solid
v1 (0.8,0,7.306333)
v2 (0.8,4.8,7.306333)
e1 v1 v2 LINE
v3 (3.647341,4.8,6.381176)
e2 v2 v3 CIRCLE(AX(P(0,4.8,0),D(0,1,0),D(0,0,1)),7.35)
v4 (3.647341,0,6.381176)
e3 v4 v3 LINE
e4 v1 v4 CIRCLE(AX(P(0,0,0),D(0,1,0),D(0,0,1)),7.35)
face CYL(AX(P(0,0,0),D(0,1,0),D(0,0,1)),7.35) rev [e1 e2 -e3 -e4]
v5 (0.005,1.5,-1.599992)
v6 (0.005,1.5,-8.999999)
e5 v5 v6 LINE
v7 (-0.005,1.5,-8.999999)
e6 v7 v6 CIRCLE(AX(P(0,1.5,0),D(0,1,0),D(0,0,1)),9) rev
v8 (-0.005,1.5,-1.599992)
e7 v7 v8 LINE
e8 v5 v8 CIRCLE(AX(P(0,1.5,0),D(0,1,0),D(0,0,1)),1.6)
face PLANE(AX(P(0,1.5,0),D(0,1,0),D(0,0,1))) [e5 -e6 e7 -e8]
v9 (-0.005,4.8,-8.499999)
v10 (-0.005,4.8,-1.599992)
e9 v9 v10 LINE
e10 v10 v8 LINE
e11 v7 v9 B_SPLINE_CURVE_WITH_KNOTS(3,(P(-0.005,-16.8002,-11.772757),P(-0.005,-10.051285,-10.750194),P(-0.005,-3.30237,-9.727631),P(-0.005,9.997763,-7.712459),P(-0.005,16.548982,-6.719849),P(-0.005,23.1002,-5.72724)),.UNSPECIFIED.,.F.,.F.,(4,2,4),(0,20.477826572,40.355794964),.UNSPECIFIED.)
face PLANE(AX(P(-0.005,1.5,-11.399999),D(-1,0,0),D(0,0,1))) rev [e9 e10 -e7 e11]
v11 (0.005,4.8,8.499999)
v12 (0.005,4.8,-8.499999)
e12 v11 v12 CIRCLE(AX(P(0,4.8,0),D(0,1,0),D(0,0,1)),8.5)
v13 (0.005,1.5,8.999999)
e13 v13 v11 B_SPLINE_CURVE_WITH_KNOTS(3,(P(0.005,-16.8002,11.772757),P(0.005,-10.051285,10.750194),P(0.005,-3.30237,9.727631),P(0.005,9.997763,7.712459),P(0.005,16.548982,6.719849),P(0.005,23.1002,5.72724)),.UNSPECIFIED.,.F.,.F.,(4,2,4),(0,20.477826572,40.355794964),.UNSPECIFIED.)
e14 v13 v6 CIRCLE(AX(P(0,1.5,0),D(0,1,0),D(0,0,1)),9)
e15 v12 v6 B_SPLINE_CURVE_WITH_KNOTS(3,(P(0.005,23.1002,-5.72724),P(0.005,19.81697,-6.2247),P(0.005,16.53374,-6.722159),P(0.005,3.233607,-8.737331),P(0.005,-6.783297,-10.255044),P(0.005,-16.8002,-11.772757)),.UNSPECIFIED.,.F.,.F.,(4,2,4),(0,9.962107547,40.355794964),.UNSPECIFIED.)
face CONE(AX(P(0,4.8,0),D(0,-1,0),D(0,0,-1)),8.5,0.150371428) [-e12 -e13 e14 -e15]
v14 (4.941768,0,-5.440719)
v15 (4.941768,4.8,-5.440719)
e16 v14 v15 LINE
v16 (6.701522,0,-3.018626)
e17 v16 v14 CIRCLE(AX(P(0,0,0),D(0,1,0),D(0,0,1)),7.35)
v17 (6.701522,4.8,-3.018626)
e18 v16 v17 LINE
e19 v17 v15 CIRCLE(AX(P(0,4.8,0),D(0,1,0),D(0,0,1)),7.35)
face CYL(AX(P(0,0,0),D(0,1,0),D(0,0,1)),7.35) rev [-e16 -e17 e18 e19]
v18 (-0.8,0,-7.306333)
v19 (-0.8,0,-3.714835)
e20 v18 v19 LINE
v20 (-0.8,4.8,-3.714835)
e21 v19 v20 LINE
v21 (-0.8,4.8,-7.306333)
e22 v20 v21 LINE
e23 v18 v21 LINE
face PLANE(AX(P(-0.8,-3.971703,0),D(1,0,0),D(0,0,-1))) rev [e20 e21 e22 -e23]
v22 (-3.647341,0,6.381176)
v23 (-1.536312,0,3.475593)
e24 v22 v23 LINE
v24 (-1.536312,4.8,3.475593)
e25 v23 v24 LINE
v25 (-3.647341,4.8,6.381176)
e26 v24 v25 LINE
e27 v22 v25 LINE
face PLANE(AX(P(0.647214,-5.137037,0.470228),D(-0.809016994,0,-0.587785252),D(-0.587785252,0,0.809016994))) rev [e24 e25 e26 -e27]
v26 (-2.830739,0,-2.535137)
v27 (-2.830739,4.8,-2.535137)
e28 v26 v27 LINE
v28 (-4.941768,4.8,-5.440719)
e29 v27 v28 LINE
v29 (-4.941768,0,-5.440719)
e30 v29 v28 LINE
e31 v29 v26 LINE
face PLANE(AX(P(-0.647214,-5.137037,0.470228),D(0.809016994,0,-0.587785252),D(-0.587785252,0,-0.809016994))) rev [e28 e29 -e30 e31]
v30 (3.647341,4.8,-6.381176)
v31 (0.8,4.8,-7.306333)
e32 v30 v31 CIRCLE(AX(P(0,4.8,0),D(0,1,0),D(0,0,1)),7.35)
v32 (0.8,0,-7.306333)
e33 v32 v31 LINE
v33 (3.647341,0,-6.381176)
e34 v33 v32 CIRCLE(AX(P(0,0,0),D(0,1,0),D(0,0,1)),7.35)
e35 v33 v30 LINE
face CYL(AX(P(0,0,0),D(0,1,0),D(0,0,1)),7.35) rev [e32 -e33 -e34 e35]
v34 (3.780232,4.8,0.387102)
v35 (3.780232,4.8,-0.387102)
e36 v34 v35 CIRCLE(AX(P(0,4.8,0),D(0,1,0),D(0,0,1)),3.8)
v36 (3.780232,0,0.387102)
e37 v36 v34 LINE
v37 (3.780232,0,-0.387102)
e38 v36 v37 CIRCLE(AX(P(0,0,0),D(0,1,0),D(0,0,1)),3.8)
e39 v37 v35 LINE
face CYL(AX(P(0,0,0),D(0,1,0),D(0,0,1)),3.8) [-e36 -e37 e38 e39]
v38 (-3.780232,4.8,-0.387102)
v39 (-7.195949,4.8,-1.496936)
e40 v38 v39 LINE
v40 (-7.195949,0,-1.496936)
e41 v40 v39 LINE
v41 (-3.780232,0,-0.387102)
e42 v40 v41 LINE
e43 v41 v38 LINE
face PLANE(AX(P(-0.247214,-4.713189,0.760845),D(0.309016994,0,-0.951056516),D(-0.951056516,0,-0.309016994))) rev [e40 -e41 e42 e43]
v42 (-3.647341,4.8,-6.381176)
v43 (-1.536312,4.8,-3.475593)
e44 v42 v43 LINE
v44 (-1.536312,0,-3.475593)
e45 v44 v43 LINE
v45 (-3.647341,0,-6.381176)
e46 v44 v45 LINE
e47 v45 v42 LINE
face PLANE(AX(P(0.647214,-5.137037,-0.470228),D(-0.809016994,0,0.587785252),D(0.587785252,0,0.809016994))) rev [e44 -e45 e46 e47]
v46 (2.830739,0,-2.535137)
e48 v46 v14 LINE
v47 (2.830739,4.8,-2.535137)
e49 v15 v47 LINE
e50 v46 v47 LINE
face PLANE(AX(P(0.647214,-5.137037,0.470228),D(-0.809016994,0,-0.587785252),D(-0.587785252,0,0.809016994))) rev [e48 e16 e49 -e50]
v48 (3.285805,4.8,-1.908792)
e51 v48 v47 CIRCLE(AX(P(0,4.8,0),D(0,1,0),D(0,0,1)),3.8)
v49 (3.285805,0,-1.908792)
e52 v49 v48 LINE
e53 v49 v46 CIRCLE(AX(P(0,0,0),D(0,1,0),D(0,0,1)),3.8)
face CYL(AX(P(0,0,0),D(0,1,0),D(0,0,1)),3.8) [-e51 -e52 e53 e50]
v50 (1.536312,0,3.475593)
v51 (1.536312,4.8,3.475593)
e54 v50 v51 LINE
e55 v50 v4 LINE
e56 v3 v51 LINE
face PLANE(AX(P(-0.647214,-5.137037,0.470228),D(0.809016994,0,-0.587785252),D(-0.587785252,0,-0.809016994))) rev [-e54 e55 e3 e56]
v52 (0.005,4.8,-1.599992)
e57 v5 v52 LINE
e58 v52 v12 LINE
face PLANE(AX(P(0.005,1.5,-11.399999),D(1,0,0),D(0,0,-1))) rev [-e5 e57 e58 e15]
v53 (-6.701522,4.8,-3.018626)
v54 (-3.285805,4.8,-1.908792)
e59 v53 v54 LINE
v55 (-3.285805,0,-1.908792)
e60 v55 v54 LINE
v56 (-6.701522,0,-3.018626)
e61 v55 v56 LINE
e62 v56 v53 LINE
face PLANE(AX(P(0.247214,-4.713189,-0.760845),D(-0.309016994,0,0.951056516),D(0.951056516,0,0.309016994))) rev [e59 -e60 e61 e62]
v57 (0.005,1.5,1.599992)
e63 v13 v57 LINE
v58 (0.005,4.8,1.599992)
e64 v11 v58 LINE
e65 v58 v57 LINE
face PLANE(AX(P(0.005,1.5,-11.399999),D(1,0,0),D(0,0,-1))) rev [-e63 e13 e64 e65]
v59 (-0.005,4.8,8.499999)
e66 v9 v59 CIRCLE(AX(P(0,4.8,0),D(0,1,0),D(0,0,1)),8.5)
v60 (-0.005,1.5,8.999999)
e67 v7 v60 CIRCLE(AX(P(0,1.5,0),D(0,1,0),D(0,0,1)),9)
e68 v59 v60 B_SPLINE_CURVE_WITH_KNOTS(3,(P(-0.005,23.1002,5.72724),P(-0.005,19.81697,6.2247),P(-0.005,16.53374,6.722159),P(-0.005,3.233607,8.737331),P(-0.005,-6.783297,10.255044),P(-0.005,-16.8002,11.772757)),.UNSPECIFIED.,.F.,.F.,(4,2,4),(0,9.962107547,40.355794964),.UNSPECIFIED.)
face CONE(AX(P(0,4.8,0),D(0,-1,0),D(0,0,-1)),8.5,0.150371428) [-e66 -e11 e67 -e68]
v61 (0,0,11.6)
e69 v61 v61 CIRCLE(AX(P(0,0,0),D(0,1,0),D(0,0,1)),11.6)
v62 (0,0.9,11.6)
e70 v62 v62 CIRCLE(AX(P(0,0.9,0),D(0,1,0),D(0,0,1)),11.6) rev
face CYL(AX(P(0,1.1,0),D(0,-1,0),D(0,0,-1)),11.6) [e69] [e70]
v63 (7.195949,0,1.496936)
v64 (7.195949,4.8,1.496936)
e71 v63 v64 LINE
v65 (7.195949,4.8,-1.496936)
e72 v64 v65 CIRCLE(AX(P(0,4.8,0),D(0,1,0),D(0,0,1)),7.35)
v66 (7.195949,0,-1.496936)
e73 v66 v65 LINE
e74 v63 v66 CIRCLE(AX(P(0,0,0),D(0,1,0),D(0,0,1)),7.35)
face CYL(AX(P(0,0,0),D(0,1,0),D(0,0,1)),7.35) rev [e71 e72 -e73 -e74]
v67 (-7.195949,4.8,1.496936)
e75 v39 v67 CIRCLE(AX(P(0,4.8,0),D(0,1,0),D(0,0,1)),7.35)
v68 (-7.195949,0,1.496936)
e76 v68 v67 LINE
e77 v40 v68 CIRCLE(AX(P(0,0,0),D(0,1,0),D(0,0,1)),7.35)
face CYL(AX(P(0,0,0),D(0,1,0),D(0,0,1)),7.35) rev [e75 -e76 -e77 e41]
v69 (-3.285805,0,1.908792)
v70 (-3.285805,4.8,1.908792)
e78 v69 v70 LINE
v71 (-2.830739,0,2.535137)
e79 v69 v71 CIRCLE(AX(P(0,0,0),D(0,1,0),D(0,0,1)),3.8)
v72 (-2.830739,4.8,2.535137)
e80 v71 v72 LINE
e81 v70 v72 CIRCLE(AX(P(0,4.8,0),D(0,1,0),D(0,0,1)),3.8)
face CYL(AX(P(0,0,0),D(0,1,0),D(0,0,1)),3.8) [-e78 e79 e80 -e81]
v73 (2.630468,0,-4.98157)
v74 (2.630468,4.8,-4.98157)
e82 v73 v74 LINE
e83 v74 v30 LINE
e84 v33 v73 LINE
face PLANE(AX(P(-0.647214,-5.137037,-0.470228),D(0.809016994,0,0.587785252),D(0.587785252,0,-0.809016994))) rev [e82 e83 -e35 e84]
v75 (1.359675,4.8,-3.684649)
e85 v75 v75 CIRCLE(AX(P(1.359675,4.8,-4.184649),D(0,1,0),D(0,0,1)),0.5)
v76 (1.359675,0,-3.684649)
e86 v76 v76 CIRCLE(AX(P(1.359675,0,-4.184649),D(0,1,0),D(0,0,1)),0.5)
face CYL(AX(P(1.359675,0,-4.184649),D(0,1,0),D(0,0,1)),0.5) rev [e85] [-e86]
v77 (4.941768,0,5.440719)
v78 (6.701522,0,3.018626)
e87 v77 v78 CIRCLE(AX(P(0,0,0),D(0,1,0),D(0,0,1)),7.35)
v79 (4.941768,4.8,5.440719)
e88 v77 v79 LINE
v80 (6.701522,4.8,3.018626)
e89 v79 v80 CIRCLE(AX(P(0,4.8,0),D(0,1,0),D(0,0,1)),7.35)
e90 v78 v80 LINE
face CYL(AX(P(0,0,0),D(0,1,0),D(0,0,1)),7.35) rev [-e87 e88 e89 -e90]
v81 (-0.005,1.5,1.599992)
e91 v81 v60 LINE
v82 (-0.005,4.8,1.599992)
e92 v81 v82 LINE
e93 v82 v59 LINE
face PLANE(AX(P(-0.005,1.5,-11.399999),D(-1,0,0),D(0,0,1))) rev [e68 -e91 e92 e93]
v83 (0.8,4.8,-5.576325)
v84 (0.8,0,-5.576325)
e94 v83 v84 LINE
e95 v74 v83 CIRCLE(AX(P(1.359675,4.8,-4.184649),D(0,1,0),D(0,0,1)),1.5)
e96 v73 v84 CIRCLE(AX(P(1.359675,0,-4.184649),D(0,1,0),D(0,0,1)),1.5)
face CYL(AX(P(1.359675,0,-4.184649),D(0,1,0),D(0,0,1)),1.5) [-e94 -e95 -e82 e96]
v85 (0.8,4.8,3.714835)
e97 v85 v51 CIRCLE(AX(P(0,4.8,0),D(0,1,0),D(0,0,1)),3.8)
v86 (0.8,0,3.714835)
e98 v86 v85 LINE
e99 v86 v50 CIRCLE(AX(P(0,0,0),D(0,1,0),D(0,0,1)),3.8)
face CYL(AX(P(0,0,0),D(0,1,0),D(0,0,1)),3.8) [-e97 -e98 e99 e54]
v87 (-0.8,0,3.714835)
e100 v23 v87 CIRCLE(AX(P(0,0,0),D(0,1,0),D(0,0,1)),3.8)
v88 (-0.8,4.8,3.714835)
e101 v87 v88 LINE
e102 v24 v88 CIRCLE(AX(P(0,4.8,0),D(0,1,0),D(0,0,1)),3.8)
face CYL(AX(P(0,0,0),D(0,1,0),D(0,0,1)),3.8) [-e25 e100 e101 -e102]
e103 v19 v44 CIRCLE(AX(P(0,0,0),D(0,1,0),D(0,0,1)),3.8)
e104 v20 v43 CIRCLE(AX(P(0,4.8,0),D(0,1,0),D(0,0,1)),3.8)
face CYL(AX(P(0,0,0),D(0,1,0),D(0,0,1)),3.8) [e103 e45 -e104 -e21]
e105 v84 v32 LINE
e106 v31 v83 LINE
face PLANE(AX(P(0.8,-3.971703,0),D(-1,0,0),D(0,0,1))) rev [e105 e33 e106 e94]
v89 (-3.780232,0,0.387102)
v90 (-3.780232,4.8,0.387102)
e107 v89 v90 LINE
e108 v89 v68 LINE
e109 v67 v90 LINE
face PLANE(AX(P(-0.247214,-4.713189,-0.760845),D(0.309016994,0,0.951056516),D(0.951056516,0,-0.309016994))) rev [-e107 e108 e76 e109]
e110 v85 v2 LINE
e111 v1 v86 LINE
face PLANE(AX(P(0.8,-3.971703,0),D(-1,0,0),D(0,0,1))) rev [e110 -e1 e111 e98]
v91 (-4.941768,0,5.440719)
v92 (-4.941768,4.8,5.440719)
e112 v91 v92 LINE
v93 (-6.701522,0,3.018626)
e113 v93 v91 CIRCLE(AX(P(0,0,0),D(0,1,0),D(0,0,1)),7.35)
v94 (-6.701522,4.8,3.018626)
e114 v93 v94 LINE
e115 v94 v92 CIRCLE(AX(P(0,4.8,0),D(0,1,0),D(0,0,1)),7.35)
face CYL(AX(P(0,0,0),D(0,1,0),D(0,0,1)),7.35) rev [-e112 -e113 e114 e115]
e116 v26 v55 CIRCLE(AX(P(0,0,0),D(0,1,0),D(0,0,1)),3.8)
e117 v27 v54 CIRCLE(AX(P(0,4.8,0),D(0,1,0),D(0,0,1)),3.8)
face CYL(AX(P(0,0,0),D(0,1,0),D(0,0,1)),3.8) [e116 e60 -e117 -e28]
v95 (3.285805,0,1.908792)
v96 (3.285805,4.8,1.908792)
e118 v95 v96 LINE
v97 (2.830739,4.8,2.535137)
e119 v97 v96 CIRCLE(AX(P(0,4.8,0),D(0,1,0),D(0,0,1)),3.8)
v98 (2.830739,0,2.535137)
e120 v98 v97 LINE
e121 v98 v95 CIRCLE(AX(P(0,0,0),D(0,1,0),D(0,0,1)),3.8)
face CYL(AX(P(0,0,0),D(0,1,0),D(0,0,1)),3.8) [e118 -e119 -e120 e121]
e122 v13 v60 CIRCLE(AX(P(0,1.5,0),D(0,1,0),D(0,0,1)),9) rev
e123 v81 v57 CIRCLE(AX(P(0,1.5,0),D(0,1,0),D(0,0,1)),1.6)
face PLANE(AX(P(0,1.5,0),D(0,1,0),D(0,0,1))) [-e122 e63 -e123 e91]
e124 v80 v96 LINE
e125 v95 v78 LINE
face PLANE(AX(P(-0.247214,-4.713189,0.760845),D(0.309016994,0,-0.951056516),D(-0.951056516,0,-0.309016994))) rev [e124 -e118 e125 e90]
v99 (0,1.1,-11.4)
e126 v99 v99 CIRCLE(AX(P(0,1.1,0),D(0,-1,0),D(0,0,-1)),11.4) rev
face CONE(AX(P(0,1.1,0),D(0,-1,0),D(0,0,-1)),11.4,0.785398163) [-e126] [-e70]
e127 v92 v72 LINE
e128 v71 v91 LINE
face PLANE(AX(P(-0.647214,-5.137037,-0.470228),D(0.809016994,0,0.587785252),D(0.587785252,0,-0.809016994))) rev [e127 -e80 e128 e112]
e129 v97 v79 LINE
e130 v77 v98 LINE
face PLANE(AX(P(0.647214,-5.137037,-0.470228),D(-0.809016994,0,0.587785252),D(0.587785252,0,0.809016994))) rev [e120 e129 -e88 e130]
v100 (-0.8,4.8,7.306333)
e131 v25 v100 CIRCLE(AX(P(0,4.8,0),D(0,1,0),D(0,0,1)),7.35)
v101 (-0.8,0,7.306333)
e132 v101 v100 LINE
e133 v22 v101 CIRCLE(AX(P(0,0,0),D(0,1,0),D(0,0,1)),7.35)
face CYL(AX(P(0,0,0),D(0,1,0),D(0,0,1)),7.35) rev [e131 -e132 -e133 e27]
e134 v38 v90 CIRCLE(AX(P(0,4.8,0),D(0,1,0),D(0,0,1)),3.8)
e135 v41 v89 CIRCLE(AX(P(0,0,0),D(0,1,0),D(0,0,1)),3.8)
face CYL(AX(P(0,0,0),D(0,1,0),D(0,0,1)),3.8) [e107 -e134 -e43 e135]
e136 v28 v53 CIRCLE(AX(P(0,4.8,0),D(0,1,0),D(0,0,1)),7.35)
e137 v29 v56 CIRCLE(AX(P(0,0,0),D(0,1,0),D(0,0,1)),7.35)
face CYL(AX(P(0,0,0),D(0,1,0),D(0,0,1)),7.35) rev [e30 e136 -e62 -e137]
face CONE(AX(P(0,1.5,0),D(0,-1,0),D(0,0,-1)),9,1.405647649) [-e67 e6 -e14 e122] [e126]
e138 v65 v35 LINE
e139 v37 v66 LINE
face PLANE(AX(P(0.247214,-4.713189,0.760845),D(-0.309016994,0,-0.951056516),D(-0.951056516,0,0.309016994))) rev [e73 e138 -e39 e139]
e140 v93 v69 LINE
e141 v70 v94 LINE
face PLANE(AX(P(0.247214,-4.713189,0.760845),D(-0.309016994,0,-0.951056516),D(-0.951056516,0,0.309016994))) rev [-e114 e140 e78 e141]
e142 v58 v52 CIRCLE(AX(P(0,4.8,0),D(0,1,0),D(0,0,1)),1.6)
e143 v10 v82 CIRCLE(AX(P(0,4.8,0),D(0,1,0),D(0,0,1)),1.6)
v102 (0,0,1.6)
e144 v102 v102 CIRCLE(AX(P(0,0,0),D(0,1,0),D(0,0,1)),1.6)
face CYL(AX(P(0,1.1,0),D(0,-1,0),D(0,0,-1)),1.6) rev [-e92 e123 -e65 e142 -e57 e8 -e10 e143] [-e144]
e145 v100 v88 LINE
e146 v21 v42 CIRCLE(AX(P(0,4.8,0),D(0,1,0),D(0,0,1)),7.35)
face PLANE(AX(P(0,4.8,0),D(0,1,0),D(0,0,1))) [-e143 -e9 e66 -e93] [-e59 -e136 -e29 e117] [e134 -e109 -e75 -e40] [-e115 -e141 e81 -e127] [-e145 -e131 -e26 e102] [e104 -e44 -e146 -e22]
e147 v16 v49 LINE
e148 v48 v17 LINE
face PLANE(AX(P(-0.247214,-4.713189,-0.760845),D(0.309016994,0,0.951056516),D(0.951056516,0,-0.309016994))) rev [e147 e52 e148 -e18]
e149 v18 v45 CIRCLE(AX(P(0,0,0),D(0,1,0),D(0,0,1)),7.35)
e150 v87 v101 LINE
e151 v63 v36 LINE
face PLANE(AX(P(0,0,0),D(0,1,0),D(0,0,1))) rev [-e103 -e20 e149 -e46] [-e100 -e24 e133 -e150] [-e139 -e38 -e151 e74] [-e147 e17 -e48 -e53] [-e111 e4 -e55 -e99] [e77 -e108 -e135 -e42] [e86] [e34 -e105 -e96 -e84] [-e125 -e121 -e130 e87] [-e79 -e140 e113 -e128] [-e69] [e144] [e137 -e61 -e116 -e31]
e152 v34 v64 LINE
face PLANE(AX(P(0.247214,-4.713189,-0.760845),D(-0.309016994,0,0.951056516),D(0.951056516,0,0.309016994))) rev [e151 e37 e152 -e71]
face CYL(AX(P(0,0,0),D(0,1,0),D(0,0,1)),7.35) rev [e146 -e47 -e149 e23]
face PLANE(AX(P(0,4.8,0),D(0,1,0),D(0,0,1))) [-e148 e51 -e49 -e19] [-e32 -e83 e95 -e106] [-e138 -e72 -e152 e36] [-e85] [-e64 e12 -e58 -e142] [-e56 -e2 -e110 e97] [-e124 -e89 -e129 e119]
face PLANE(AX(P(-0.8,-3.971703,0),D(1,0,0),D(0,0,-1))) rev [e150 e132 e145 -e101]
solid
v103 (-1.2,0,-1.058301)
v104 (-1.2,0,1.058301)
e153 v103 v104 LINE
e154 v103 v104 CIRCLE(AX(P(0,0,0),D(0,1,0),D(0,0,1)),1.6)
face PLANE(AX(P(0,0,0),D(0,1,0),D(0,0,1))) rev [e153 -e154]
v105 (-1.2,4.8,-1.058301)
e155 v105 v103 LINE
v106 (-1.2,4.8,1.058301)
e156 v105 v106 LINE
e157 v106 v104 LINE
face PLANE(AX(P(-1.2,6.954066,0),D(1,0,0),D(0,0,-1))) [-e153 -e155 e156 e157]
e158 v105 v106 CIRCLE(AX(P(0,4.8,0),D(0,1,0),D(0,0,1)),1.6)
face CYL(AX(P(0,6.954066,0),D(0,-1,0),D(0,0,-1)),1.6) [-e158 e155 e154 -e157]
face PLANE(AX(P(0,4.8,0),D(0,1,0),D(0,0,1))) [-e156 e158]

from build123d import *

# Parameters (mm, degrees)
SKETCH_4_R               = 11.6
SKETCH_4_R_2             = 1.6
EXTRUDE_1_DEPTH          = 1.1
EXTRUDE_START            = 1.5
SKETCH_4_3_R             = 9
SKETCH_4_3_R_2           = 1.6
EXTRUDE_2_DEPTH          = 3.3
CHAMFER_1_SIZE           = 0.2
SKETCH_4_4_R             = 1.6
CUT_EXTRUDE_2_DEPTH      = 18.092688495
CHAMFER_2_SIZE           = 0.5
CHAMFER_2_SIZE_2         = 3.3
CUT_EXTRUDE_4_DEPTH      = 18.092688495
EXTRUDE_3_DEPTH          = 4.8
PATTERN_CIRCULAR_2_COUNT = 10
SKETCH_6_R               = 1.5
EXTRUDE_4_DEPTH          = 4.8
SKETCH_6_3_R             = 0.5
CUT_EXTRUDE_5_DEPTH      = 18.092688495
EXTRUDE_5_DEPTH          = 4.8
SKETCH_7_W               = 0.01
SKETCH_7_H               = 22.799997808
CUT_EXTRUDE_6_DEPTH      = 3.3


with BuildPart() as part:
    # 草图4 → 凸台-拉伸1 (new body)
    with BuildSketch(Plane(origin=(0, 0, 0), x_dir=(1, 0, 0), z_dir=(0, 1, 0))):
        with Locations(Location((0, 0, 0), (0, 0, 270))):
            Circle(SKETCH_4_R)
        with Locations(Location((0, 0, 0), (0, 0, 270))):
            Circle(SKETCH_4_R_2, mode=Mode.SUBTRACT)
    extrude(amount=EXTRUDE_1_DEPTH)

    # 倒角1
    chamfer_1_edges = [part.edges().sort_by_distance(p)[0] for p in [
        (0, 1.1, -11.6),
    ]]
    chamfer(chamfer_1_edges, length=CHAMFER_1_SIZE)


with BuildPart() as body_2:
    # 草图4<3> → 凸台-拉伸2 (new body)
    with BuildSketch(Plane(origin=(0, 0, 0), x_dir=(1, 0, 0), z_dir=(0, 1, 0)).offset(EXTRUDE_START)):
        with Locations(Location((0, 0, 0), (0, 0, 270))):
            Circle(SKETCH_4_3_R)
        with Locations(Location((0, 0, 0), (0, 0, 270))):
            Circle(SKETCH_4_3_R_2, mode=Mode.SUBTRACT)
    extrude(amount=EXTRUDE_2_DEPTH)


    add(part.part)  # loft_1 joins it to this body
    # loft up to a face of the part (loft_1)
    loft([Face(Wire([body_2.edges().sort_by_distance((-6.560717647, 1.5, -6.160923953))[0]])), Face(Wire([body_2.edges().sort_by_distance((8.310242353, 1.1, -7.803837008))[0]]))])

    # 草图4<4> → 切除-拉伸2 (cut, through all)
    with BuildSketch(Plane(origin=(0, 0, 0), x_dir=(1, 0, 0), z_dir=(0, 1, 0))):
        with Locations(Location((0, 0, 0), (0, 0, 270))):
            Circle(SKETCH_4_4_R)
    extrude(amount=CUT_EXTRUDE_2_DEPTH, mode=Mode.SUBTRACT)

    # 倒角2
    # the kernel refuses this chamfer: 3.3, 0.5 mm, written as the material it takes off along each edge
    with BuildSketch(Plane(origin=(0, 4.8, 0), x_dir=(0, 0, 1), z_dir=(-1, 0, 0))) as chamfer_2_piece_1:
        Polygon((9 - CHAMFER_2_SIZE, 0), (9, -CHAMFER_2_SIZE_2), (9, 0), align=None)
    revolve(axis=Axis((0, 4.8, 0), (0, 1, 0)), mode=Mode.SUBTRACT)

    # 草图5 → 切除-拉伸4 (cut, through all)
    with BuildSketch(Plane(origin=(0, 4.8, 0), x_dir=(1, 0, 0), z_dir=(0, 1, 0))):
        with BuildLine():
            ThreePointArc((3.8, 0), (-2.387467277, -2.9563491), (-0.8, 3.714835124))
            Line((-0.8, 3.714835124), (-0.8, 7.30633287))
            ThreePointArc((-0.8, 7.30633287), (-4.906246019, -5.47277352), (7.35, 0))
            ThreePointArc((7.35, 0), (5.47277352, 4.906246019), (0.8, 7.30633287))
            Line((0.8, 7.30633287), (0.8, 3.714835124))
            ThreePointArc((0.8, 3.714835124), (2.9563491, 2.387467277), (3.8, 0))
        make_face()
        with BuildLine():
            Line((-0.8, 7.30633287), (-0.8, 3.714835124))
            ThreePointArc((-0.8, 3.714835124), (-0.402260194, 3.778648798), (0, 3.8))
            Line((0, 3.8), (0, 7.35))
            ThreePointArc((0, 7.35), (-0.400595438, 7.339075098), (-0.8, 7.30633287))
        make_face()
        with BuildLine():
            Line((0, 7.35), (0, 3.8))
            ThreePointArc((0, 3.8), (0.402260194, 3.778648798), (0.8, 3.714835124))
            Line((0.8, 3.714835124), (0.8, 7.30633287))
            ThreePointArc((0.8, 7.30633287), (0.400595438, 7.339075098), (0, 7.35))
        make_face()
    extrude(amount=-CUT_EXTRUDE_4_DEPTH, mode=Mode.SUBTRACT)


with BuildPart() as cut_extrude_4_piece_1:
    # of the separate pieces the step leaves, piece 1, a body of its own (cut_extrude_4_pieces)
    add(body_2.part.solids().sort_by_distance((0, 0.9, 11.6))[0])

    # 草图5<4> → 凸台-拉伸3 (add)
    with BuildSketch(Plane(origin=(0, 4.8, 0), x_dir=(1, 0, 0), z_dir=(0, 1, 0))):
        with BuildLine():
            Line((0, 7.35), (0, 3.8))
            ThreePointArc((0, 3.8), (0.402260194, 3.778648798), (0.8, 3.714835124))
            Line((0.8, 3.714835124), (0.8, 7.30633287))
            ThreePointArc((0.8, 7.30633287), (0.400595438, 7.339075098), (0, 7.35))
        make_face()
        with BuildLine():
            Line((-0.8, 7.30633287), (-0.8, 3.714835124))
            ThreePointArc((-0.8, 3.714835124), (-0.402260194, 3.778648798), (0, 3.8))
            Line((0, 3.8), (0, 7.35))
            ThreePointArc((0, 7.35), (-0.400595438, 7.339075098), (-0.8, 7.30633287))
        make_face()
    extrude_3 = extrude(amount=-EXTRUDE_3_DEPTH)

    # 阵列(圆周)2: 凸台-拉伸3 ×10 about axis
    pattern_circular_2_axis = Axis((0, 0, 0), (0, 1, 0))
    for i in range(1, PATTERN_CIRCULAR_2_COUNT):
        add(extrude_3.rotate(pattern_circular_2_axis, i * 360 / PATTERN_CIRCULAR_2_COUNT))



with BuildPart() as cut_extrude_4_piece_2:
    # of the separate pieces the step leaves, piece 2, a body of its own (cut_extrude_4_pieces)
    add(body_2.part.solids().sort_by_distance((-0.8, 0, -3.714835124))[0])


with BuildPart() as cut_extrude_4_piece_1_1:
    add(cut_extrude_4_piece_1.part)

    add(cut_extrude_4_piece_2.part)  # 凸台-拉伸4 merges 切除-拉伸4 piece 2
    # 草图6 → 凸台-拉伸4 (add, through all)
    with BuildSketch(Plane(origin=(0, 4.8, 0), x_dir=(1, 0, 0), z_dir=(0, 1, 0))):
        with Locations((1.359674775, 4.184648672)):
            Circle(SKETCH_6_R)
    extrude(amount=-EXTRUDE_4_DEPTH)

    # 草图6<3> → 切除-拉伸5 (cut, through all)
    with BuildSketch(Plane(origin=(0, 4.8, 0), x_dir=(1, 0, 0), z_dir=(0, 1, 0))):
        with Locations(Location((1.359674775, 4.184648672, 0), (0, 0, 270))):
            Circle(SKETCH_6_3_R)
    extrude(amount=-CUT_EXTRUDE_5_DEPTH, mode=Mode.SUBTRACT)

    # 草图7 → 切除-拉伸6 (cut)
    with BuildSketch(Plane(origin=(0, 4.8, 0), x_dir=(1, 0, 0), z_dir=(0, 1, 0))):
        Rectangle(SKETCH_7_W, SKETCH_7_H)
    extrude(amount=-CUT_EXTRUDE_6_DEPTH, mode=Mode.SUBTRACT)


with BuildPart() as body_2_2:
    # 草图4<6> → 凸台-拉伸5 (new body)
    with BuildSketch(Plane(origin=(0, 0, 0), x_dir=(1, 0, 0), z_dir=(0, 1, 0))):
        with BuildLine():
            Line((-1.2, -1.058300524), (-1.2, 1.058300524))
            ThreePointArc((-1.2, 1.058300524), (-1.6, 0), (-1.2, -1.058300524))
        make_face()
    extrude(amount=EXTRUDE_5_DEPTH)


solid = Compound([cut_extrude_4_piece_1_1.part, body_2_2.part])
